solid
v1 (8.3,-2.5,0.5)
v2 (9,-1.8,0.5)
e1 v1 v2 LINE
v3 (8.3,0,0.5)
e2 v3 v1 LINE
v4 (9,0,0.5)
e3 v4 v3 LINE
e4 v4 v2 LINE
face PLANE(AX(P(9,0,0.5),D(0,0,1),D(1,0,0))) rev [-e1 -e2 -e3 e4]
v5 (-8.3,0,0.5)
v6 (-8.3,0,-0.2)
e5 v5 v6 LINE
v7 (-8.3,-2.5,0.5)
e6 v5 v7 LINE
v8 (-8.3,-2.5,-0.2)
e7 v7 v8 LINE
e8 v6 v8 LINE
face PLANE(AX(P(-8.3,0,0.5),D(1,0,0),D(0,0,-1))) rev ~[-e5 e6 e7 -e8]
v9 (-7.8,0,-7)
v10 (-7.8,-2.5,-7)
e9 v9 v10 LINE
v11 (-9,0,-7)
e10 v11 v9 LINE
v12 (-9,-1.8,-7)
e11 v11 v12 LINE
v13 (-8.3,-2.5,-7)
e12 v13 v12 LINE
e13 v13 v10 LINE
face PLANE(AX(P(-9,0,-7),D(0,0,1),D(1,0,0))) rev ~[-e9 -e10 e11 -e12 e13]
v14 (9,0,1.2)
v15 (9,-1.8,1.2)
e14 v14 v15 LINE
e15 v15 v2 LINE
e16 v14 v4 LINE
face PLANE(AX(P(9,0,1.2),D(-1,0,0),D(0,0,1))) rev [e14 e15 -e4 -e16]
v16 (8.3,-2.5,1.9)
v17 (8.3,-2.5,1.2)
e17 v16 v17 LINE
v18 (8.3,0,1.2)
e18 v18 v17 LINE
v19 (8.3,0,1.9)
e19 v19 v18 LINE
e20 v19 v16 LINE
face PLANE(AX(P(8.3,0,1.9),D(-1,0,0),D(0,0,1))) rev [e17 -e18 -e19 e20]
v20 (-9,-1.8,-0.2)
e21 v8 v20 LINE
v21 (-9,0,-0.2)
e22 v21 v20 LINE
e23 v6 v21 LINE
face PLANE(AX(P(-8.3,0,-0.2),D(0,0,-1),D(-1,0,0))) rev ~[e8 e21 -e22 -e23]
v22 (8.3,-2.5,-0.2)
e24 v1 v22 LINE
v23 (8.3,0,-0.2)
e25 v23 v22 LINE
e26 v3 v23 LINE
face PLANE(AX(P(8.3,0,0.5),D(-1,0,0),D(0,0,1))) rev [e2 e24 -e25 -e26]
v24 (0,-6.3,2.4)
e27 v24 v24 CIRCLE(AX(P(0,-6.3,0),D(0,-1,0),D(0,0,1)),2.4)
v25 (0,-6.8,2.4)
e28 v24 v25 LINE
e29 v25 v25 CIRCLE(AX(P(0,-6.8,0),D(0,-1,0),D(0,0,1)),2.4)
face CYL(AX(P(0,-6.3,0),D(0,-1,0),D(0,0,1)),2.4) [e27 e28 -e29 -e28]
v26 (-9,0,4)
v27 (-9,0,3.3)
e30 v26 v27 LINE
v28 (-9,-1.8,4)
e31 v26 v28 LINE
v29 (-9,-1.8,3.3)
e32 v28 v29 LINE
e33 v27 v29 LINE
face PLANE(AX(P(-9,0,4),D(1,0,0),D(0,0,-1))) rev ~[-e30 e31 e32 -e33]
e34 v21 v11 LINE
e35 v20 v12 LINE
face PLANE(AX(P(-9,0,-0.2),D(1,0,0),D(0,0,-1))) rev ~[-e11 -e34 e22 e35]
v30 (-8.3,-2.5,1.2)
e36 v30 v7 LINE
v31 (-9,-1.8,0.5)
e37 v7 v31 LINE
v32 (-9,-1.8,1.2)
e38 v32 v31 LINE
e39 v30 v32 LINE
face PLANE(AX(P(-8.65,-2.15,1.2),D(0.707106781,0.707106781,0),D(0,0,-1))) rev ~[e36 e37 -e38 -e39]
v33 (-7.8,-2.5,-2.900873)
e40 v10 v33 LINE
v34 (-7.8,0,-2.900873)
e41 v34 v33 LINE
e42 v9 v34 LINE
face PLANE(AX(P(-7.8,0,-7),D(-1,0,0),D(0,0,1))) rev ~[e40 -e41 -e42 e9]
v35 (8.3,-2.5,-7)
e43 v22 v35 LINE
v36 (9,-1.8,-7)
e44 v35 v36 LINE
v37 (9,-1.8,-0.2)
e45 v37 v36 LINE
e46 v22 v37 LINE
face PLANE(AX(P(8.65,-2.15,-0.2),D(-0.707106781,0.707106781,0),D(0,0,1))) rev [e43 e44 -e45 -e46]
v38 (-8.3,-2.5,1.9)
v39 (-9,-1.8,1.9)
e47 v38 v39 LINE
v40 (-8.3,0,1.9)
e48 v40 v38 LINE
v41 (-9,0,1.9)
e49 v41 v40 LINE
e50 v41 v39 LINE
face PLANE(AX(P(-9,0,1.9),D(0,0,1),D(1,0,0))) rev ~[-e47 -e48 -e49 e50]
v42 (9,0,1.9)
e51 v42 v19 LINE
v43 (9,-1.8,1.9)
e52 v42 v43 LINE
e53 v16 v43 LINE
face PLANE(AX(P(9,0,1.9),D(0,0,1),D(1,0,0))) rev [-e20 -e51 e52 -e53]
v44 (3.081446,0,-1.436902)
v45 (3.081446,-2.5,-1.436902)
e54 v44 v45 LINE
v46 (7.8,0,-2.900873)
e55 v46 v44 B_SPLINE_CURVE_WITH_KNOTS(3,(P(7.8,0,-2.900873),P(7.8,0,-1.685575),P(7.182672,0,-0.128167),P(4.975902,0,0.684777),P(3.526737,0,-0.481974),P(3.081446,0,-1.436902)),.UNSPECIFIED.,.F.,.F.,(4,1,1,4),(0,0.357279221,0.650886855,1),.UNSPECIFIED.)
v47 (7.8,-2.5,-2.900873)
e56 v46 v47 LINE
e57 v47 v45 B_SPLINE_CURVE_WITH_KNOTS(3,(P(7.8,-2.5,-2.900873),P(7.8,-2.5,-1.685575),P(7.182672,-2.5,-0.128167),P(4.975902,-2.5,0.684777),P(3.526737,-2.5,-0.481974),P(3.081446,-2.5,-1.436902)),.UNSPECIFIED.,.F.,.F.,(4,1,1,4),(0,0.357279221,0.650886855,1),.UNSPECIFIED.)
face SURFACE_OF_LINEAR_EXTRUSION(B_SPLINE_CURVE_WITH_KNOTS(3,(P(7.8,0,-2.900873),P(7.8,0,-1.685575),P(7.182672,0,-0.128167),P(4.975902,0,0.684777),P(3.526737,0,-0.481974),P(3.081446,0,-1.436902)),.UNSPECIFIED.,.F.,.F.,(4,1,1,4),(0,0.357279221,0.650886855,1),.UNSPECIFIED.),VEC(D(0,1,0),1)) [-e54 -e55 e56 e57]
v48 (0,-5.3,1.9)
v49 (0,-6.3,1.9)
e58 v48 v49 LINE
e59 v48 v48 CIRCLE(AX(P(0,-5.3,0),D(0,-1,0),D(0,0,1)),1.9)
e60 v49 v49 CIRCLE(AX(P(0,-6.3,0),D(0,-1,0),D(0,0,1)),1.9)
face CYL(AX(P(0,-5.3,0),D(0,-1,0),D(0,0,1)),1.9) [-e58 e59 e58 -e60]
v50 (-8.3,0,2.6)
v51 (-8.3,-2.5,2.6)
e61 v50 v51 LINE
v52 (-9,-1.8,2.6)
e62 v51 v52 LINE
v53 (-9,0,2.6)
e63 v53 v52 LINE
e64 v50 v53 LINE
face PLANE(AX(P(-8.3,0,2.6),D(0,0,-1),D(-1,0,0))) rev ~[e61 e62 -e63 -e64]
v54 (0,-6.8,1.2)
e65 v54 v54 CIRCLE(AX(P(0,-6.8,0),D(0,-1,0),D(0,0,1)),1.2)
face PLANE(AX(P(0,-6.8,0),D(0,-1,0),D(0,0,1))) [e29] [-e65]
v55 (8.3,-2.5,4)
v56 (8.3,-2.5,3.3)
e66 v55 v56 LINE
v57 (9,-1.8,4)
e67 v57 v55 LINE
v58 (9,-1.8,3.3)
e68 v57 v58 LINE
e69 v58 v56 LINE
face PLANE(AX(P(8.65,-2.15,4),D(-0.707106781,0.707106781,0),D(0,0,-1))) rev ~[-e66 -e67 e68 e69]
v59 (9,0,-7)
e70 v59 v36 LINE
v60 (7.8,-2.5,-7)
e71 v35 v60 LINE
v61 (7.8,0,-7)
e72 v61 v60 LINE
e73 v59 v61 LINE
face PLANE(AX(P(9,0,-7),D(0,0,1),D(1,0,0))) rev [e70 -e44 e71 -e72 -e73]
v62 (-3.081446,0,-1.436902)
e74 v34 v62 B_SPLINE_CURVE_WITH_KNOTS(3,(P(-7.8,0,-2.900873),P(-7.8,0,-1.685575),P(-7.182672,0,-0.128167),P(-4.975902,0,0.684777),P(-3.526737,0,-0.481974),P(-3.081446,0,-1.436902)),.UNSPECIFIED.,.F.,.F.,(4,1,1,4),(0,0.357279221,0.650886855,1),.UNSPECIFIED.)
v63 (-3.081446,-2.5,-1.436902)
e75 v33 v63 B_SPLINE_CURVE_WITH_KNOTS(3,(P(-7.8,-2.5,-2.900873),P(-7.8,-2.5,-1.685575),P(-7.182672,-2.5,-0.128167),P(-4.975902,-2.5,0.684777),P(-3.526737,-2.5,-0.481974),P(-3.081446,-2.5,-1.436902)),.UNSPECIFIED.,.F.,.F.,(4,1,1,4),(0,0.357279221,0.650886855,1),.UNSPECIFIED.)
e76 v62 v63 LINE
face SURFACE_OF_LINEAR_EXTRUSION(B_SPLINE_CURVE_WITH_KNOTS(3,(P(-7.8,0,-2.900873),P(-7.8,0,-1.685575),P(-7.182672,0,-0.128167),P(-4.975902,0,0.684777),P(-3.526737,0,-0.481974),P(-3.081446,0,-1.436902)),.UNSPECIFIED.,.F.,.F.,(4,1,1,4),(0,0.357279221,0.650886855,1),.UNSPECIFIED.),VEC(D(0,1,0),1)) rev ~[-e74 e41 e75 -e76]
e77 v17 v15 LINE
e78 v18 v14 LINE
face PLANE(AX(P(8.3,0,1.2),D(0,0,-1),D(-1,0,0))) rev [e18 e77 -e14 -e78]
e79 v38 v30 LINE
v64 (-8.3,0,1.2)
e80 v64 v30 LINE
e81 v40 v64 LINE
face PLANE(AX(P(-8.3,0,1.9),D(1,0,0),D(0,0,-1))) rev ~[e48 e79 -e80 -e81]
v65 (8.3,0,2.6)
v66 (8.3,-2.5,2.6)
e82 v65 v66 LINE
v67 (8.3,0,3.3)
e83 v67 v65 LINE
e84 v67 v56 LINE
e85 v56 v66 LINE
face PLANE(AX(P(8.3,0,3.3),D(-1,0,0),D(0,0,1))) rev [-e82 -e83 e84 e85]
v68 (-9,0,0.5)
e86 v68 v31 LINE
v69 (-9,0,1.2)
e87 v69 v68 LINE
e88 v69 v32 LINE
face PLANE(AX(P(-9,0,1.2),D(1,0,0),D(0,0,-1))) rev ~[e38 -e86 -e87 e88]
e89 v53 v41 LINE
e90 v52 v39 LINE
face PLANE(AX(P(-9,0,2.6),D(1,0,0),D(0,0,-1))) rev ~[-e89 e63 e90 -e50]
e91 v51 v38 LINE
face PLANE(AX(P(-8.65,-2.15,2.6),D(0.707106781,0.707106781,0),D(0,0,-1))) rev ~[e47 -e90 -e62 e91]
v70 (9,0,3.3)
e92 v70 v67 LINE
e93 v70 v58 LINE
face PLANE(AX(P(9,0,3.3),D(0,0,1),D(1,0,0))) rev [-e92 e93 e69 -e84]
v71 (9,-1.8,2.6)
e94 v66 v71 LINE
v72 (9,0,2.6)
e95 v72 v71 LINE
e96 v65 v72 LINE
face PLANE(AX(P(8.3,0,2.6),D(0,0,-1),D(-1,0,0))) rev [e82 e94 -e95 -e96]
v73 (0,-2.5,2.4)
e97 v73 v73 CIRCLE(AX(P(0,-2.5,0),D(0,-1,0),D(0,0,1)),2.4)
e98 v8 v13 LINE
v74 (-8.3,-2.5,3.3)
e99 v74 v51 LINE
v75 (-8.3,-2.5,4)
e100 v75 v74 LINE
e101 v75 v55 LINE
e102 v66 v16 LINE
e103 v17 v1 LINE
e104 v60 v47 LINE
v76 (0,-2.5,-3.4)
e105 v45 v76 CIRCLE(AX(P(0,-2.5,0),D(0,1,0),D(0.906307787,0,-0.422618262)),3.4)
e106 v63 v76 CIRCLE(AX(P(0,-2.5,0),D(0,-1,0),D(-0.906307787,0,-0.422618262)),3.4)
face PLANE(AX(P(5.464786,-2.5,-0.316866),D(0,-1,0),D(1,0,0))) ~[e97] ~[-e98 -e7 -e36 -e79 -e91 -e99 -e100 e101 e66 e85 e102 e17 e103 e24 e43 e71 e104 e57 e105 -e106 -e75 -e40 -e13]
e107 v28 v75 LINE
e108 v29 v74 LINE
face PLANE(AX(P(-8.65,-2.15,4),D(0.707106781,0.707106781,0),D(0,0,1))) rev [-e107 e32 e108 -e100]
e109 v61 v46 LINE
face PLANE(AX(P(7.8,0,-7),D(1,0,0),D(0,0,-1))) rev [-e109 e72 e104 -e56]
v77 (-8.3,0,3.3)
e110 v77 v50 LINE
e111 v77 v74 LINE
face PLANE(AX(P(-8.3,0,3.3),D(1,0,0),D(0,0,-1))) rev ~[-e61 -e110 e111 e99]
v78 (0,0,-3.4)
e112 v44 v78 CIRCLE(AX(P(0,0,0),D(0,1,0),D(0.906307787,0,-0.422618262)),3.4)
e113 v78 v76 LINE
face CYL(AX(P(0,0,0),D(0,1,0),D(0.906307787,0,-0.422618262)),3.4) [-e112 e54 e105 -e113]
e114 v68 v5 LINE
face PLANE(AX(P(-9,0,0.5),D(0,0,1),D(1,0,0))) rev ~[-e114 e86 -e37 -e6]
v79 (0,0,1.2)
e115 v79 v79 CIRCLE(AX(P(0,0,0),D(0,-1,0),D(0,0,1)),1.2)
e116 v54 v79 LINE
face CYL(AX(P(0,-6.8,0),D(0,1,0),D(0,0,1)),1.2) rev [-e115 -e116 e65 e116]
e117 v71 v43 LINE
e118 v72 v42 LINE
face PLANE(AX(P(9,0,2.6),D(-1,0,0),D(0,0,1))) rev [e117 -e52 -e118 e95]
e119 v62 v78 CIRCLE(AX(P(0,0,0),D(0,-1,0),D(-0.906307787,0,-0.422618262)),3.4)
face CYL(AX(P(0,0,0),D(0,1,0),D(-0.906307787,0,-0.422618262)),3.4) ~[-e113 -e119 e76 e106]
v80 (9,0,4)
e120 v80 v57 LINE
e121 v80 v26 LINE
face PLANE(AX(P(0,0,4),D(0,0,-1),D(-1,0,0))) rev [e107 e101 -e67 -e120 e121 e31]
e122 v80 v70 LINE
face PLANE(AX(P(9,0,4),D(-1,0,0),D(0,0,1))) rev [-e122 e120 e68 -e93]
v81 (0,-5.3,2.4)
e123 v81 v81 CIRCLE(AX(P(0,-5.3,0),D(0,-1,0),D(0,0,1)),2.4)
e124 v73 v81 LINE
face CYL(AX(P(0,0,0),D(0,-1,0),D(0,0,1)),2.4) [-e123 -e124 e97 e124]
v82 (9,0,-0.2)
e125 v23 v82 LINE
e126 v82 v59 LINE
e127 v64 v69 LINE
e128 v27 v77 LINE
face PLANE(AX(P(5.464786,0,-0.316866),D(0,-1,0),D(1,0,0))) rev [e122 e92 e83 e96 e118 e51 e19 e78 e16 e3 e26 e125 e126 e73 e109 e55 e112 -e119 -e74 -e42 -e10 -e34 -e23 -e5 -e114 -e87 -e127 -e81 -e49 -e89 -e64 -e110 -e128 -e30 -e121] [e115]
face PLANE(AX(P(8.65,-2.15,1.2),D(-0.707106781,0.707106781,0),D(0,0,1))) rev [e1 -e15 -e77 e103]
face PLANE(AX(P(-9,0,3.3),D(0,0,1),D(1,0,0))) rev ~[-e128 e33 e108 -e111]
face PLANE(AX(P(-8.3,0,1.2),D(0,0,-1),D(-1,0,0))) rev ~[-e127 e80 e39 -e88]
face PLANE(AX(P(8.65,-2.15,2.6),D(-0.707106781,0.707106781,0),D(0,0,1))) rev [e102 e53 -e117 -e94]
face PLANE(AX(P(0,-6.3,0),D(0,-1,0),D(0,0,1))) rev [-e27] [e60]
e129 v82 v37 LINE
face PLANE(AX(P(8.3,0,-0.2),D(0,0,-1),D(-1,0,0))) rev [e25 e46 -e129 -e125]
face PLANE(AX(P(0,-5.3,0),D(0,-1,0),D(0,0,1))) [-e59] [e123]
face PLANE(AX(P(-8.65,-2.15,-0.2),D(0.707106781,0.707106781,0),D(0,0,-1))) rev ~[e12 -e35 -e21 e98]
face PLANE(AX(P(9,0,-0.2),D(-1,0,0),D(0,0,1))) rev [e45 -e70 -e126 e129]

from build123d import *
from build123d import SkipClean  # not in build123d's __all__

# Parameters (mm, degrees)
F1_DEPTH = 2.5
F4_SIZE  = 0.7
F3_W     = 2.5
F3_H     = 1.2


with BuildPart() as f1:
    # F0 (on Front) → F1 (new body)
    with BuildSketch(Plane.XZ):
        with BuildLine():
            Line((0, 4), (-9, 4))
            Line((-9, 4), (-9, 3.3))
            Line((-9, 3.3), (-8.3, 3.3))
            Line((-8.3, 3.3), (-8.3, 2.6))
            Line((-8.3, 2.6), (-9, 2.6))
            Line((-9, 2.6), (-9, 1.9))
            Line((-9, 1.9), (-8.3, 1.9))
            Line((-8.3, 1.9), (-8.3, 1.2))
            Line((-8.3, 1.2), (-9, 1.2))
            Line((-9, 1.2), (-9, 0.5))
            Line((-9, 0.5), (-8.3, 0.5))
            Line((-8.3, 0.5), (-8.3, -0.2))
            Line((-8.3, -0.2), (-9, -0.2))
            Line((-9, -0.2), (-9, -7))
            Line((-9, -7), (-7.8, -7))
            Line((-7.8, -7), (-7.8, -2.900873477))
            add(Edge.make_bspline(
                [(-7.8, -2.900873477), (-7.8, -1.685574969), (-7.1826716424, -0.1281665724), (-4.9759016066, 0.6847768295), (-3.5267368498, -0.4819738014), (-3.0814464759, -1.4369020899)],
                knots=[0, 0, 0, 0, 0.3572792207, 0.6508868549, 1, 1, 1, 1], degree=3))
            ThreePointArc((-3.0814464759, -1.4369020899), (-1.8268186684, -2.8675309158), (0, -3.4))
            Line((0, -3.4), (0, -2.4))
            ThreePointArc((0, -2.4), (-2.4, 0), (0, 2.4))
            Line((0, 2.4), (0, 4))
        make_face()
    extrude(amount=F1_DEPTH)

    # F2: F1 across plane


with BuildPart() as f1_1:
    add(f1.part, clean=False)
    with SkipClean():  # cleaning this boolean's faces spoils the solid; the shape is the same uncleaned
        add(f1.part.mirror(Plane.YZ), clean=False)

    # F4
    f4_edges = [f1_1.edges().sort_by_distance(p)[0] for p in [
        (-9, -2.5, -3.6),
        (9, -2.5, -3.6),
        (-9, -2.5, 3.65),
        (-9, -2.5, 2.25),
        (-9, -2.5, 0.85),
        (9, -2.5, 3.65),
        (9, -2.5, 2.25),
        (9, -2.5, 0.85),
    ]]
    chamfer(f4_edges, length=F4_SIZE)

    # F3 (on Right) → F5 (revolve)
    with BuildSketch(Plane.YZ):
        Polygon((-2.5, 1.2), (-2.5, 2.4), (-5.3, 2.4), (-5.3, 1.9), (-6.3, 1.9), (-6.3, 2.4), (-6.8, 2.4), (-6.8, 1.2), align=None)
        with Locations((-1.25, 1.8)):
            Rectangle(F3_W, F3_H)
    revolve(axis=Axis((0, -3.9747959284, 0), (0, -1, 0)))


solid = f1_1.part
